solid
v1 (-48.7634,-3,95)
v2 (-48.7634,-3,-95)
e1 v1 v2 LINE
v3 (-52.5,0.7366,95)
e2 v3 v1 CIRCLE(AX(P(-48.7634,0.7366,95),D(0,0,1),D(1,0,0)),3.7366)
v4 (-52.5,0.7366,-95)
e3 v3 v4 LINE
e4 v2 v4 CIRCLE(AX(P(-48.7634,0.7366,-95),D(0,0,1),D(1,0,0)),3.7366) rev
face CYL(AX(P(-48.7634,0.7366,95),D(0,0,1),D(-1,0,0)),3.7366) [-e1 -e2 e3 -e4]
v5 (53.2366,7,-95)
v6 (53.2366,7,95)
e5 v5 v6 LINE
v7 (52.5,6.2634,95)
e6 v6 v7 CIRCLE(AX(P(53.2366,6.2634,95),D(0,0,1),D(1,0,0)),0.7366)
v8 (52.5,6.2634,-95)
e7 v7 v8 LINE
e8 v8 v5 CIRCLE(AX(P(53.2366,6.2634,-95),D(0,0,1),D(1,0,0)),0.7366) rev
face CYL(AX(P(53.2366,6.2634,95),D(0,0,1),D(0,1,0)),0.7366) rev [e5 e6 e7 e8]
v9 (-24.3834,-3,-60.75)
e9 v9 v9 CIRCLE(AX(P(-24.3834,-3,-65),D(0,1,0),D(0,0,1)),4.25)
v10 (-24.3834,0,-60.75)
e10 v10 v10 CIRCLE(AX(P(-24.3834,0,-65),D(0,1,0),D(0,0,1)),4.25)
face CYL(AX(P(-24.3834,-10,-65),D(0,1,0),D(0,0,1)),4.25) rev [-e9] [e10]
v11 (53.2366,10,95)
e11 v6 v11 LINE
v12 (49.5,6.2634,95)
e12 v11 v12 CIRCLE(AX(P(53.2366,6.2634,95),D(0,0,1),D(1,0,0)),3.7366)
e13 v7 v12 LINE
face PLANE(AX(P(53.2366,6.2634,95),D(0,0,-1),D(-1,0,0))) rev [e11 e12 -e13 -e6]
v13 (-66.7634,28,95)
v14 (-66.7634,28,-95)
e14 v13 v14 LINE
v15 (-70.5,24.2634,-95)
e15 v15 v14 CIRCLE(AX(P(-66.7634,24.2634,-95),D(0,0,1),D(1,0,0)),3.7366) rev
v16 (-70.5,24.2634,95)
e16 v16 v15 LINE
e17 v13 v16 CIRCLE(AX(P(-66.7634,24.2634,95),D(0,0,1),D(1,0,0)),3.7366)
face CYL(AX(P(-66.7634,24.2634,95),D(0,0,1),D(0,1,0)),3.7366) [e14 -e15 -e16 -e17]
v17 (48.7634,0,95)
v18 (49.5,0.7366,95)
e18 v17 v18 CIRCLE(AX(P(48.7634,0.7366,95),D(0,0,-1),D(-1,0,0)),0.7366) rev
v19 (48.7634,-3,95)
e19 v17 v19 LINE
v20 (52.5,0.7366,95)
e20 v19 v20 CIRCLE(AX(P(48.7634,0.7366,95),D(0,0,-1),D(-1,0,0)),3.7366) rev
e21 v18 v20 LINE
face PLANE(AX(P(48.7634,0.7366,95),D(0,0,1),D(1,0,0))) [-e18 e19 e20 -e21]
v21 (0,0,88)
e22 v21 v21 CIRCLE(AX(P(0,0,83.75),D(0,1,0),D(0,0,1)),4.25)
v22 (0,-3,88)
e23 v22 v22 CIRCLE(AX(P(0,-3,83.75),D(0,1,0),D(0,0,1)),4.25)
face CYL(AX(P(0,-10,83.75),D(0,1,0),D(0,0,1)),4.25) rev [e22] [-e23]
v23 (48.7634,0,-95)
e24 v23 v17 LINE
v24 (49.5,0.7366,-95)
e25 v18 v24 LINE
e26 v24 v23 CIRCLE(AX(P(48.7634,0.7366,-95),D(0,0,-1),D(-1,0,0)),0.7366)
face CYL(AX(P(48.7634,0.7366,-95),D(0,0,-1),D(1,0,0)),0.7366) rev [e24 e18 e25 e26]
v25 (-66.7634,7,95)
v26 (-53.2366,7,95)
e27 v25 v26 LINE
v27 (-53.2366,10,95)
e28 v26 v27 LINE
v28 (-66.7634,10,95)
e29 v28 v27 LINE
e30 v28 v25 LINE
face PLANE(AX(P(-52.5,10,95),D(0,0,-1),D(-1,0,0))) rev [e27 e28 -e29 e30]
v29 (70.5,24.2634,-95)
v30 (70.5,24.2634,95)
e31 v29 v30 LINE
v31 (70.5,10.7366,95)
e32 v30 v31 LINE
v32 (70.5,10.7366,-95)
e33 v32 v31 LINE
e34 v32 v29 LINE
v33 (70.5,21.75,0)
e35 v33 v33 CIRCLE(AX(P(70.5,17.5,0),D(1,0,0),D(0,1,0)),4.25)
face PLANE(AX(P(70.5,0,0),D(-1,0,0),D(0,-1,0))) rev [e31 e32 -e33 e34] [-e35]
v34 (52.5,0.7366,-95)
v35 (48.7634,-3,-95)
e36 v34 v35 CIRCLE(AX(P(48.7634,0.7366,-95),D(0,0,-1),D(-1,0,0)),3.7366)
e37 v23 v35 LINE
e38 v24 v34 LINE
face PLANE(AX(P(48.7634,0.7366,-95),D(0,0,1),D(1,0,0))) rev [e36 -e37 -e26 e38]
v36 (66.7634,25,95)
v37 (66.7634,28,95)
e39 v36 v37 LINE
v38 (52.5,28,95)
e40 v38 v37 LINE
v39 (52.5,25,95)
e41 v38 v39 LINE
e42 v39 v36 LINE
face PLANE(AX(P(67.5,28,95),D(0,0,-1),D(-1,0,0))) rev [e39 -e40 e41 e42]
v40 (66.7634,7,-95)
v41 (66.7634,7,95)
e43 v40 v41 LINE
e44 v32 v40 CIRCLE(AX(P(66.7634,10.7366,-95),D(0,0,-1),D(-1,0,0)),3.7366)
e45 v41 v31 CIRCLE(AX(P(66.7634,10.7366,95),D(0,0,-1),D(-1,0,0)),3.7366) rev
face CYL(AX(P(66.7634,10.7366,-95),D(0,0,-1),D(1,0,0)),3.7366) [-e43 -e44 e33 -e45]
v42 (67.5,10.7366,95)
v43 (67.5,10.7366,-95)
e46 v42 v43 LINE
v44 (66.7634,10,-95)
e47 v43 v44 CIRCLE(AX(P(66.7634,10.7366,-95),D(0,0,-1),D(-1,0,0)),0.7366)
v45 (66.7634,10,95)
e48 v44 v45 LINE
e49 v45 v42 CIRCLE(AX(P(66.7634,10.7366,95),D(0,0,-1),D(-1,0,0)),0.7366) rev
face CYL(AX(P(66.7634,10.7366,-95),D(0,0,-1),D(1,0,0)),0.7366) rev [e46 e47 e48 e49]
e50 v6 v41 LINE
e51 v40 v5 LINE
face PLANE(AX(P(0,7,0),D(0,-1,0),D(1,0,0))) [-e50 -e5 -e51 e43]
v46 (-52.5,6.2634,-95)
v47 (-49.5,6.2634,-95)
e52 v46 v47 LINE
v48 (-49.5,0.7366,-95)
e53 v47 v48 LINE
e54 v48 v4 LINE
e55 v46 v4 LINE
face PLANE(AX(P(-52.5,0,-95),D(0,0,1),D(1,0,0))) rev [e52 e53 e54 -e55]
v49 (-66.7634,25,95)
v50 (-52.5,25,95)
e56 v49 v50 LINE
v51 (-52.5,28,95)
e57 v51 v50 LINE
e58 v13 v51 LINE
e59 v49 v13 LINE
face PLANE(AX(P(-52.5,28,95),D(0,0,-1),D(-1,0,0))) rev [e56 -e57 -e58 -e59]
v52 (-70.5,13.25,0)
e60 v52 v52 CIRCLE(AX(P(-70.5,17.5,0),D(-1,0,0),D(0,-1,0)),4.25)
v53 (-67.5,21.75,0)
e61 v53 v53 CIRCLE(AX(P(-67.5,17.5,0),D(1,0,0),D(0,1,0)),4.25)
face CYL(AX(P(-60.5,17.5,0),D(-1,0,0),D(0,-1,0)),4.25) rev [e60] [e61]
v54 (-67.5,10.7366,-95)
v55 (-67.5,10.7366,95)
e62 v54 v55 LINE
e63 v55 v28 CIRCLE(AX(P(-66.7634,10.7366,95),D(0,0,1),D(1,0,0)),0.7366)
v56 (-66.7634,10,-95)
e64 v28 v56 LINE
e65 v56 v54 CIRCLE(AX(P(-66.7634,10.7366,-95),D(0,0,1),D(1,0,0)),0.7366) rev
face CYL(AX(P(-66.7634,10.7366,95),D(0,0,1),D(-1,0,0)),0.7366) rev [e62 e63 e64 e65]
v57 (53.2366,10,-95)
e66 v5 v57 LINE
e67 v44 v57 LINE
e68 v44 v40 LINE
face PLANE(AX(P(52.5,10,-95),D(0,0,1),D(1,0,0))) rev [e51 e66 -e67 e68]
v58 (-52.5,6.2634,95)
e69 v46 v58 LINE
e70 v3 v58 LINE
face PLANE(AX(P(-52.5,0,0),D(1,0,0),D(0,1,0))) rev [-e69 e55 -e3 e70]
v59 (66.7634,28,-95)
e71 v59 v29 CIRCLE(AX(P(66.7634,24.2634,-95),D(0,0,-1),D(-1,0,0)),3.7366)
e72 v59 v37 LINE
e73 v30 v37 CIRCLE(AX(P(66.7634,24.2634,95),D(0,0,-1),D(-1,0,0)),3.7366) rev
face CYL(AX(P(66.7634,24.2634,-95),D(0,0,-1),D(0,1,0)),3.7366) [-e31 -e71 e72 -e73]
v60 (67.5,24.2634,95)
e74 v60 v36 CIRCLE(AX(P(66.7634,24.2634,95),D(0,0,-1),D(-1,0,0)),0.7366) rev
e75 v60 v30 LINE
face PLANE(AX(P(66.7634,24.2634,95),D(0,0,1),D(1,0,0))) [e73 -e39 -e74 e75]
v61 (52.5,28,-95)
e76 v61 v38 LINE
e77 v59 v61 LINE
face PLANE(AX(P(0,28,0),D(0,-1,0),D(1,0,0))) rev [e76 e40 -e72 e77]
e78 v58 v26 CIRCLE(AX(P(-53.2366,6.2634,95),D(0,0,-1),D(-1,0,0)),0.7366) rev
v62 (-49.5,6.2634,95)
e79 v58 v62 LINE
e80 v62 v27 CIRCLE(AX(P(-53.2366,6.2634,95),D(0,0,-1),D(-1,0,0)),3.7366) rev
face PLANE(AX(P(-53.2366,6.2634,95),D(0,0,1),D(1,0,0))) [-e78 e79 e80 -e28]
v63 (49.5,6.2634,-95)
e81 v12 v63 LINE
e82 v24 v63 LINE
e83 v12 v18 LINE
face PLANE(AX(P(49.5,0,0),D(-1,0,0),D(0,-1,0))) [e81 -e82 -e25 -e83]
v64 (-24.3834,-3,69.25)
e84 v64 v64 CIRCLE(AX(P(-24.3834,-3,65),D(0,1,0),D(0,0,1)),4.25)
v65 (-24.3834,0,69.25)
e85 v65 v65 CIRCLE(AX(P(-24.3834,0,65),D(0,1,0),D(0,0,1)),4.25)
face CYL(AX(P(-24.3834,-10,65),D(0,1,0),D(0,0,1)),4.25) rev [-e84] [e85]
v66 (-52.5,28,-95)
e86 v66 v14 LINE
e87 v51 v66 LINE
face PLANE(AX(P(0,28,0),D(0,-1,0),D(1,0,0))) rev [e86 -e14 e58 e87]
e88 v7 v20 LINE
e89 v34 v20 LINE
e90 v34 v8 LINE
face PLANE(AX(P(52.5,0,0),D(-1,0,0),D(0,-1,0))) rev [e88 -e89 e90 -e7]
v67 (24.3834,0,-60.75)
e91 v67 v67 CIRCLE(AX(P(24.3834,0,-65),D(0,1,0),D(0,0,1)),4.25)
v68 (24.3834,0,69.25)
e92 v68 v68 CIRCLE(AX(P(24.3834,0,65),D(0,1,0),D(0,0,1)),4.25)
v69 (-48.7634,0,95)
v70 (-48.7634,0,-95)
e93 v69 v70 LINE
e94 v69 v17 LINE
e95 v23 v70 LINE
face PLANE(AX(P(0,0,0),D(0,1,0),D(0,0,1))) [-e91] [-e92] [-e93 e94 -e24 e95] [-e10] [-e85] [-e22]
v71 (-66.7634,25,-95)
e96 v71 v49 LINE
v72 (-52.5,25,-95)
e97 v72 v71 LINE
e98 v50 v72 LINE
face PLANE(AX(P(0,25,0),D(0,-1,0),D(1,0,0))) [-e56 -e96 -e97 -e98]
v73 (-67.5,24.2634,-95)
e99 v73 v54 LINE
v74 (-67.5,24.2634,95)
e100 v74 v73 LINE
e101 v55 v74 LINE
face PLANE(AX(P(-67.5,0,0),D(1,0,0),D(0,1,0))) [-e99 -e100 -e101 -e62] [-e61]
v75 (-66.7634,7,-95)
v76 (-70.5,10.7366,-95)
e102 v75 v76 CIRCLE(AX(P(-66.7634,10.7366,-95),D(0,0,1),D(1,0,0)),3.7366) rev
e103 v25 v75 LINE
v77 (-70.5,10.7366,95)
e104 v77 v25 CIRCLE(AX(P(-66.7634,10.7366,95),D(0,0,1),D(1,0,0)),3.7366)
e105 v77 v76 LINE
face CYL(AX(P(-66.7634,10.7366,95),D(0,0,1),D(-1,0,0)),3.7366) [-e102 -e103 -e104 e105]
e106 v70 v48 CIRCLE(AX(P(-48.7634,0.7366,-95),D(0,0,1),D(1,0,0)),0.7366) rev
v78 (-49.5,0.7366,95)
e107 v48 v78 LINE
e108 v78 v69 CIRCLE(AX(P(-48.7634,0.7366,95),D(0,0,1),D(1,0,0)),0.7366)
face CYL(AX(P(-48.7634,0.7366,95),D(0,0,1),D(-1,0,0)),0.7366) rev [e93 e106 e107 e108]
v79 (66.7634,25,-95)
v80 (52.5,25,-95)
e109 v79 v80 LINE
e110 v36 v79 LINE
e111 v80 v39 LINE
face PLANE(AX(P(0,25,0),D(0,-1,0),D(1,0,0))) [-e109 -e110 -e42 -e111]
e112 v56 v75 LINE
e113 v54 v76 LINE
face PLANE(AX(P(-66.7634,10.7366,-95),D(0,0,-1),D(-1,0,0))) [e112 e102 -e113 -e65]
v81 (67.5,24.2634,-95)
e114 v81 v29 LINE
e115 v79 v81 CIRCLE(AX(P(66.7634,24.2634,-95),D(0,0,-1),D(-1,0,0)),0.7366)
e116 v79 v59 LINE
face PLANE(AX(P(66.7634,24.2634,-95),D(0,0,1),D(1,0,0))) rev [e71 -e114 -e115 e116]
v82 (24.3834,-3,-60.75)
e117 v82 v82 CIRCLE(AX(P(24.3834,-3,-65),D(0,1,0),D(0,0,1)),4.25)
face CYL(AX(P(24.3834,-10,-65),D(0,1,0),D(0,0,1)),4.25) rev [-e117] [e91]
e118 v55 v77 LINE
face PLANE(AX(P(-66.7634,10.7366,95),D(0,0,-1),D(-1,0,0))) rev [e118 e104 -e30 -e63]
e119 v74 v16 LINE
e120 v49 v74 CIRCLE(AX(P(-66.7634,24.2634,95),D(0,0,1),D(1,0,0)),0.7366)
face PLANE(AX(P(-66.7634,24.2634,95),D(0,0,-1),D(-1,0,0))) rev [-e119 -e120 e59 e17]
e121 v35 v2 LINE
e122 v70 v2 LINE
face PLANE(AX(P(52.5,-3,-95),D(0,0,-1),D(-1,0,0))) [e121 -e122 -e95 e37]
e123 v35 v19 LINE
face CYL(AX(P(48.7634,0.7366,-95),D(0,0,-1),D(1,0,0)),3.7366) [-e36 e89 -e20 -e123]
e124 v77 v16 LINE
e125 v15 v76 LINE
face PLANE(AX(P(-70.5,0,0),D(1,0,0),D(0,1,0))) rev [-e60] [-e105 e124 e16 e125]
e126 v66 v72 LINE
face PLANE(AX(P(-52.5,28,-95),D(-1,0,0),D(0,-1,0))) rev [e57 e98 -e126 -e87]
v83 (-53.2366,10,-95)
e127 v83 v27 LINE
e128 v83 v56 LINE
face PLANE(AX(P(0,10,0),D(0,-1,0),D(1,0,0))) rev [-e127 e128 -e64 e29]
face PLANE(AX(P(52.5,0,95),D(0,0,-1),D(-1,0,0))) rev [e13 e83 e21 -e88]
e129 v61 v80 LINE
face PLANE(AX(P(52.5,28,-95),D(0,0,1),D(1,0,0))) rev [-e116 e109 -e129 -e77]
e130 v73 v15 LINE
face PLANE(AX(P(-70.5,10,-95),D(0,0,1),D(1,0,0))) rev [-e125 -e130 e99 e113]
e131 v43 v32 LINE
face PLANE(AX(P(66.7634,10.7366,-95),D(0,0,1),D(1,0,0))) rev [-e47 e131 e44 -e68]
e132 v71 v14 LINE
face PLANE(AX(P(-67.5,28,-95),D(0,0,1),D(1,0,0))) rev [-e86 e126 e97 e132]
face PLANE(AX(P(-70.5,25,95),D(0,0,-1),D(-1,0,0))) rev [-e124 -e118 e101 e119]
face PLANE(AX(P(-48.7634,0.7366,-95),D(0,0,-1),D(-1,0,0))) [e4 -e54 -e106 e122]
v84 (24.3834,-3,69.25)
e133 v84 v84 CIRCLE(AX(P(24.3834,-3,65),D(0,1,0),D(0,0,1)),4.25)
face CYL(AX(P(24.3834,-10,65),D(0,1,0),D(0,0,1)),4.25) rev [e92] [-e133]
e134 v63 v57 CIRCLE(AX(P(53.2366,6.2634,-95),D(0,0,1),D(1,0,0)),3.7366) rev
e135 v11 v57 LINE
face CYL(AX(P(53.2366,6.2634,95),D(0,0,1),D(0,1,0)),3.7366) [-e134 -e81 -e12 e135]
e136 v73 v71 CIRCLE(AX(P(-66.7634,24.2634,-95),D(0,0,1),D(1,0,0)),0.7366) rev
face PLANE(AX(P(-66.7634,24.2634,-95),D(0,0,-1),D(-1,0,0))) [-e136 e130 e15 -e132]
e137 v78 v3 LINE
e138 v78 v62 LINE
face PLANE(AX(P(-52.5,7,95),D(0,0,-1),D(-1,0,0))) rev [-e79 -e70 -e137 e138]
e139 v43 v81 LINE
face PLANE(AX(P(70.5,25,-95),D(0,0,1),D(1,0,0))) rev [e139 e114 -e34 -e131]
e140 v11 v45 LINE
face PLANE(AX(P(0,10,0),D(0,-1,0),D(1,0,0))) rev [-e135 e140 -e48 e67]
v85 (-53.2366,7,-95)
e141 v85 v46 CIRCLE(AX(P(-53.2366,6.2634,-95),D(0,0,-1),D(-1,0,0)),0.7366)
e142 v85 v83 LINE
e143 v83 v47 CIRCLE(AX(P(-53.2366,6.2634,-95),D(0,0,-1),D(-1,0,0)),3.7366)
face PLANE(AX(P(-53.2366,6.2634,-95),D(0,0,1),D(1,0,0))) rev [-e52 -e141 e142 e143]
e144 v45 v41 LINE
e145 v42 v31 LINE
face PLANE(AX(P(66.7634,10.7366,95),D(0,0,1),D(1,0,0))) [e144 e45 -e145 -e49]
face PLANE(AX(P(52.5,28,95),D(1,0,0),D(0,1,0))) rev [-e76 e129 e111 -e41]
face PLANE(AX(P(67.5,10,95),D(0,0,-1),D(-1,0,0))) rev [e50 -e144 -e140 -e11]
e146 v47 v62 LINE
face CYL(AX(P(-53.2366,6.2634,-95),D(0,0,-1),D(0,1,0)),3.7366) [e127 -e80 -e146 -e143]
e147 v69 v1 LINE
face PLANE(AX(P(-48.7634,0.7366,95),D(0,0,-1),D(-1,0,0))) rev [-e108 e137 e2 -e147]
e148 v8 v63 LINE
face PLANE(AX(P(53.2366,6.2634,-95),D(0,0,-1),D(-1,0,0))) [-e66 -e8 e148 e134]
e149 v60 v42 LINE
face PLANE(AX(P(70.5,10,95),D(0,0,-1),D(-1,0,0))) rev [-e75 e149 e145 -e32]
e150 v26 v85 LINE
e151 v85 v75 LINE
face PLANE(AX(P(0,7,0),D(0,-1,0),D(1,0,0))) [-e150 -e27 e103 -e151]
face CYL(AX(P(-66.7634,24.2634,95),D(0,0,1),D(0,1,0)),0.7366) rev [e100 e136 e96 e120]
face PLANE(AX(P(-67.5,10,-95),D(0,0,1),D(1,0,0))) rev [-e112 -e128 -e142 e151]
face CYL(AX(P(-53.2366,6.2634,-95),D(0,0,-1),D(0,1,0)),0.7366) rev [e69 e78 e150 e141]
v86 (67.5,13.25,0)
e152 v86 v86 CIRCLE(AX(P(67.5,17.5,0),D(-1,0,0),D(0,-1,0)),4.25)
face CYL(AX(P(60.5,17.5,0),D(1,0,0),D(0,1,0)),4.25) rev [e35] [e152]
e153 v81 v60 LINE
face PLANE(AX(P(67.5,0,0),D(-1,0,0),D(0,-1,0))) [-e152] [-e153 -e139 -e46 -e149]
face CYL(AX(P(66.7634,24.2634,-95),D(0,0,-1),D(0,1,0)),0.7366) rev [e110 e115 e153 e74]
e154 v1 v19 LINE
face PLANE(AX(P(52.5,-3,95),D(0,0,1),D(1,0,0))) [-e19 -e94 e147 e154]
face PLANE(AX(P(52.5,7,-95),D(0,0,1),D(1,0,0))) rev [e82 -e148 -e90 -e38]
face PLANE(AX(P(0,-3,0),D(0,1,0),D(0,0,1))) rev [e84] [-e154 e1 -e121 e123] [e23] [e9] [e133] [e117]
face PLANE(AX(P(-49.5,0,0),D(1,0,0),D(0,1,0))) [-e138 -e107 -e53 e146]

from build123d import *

# Parameters (mm, degrees)
SKETCH1_W                       = 105
SKETCH1_H                       = 190
BASE_FLANGE1_DEPTH              = 3
EDGE_FLANGE1_STRIP_W            = 13.4732
EDGE_FLANGE1_STRIP_H            = 3
EDGE_FLANGE1_STRIP_CUT_DEPTH    = 190
EDGE_FLANGE1_STRIP_2_W          = 13.4732
EDGE_FLANGE1_STRIP_2_H          = 3
EDGE_FLANGE1_STRIP_CUT_2_DEPTH  = 190
EDGE_FLANGE1_DEPTH              = 190
EDGE_FLANGE1_BEND_DEPTH         = 190
SKETCH33_R                      = 4.25
CUT_EXTRUDE1_DEPTH              = 10
EDGE_FLANGE8_STRIP_W            = 13.4732
EDGE_FLANGE8_STRIP_H            = 3
EDGE_FLANGE8_STRIP_CUT_DEPTH    = 190
EDGE_FLANGE8_STRIP_2_W          = 13.4732
EDGE_FLANGE8_STRIP_2_H          = 3
EDGE_FLANGE8_STRIP_CUT_2_DEPTH  = 190
EDGE_FLANGE8_DEPTH              = 190
EDGE_FLANGE8_BEND_DEPTH         = 190
EDGE_FLANGE9_STRIP_W            = 13.4732
EDGE_FLANGE9_STRIP_H            = 3
EDGE_FLANGE9_STRIP_CUT_DEPTH    = 190
EDGE_FLANGE9_STRIP_2_W          = 13.4732
EDGE_FLANGE9_STRIP_2_H          = 3
EDGE_FLANGE9_STRIP_CUT_2_DEPTH  = 190
EDGE_FLANGE9_DEPTH              = 190
EDGE_FLANGE9_BEND_DEPTH         = 190
EDGE_FLANGE10_STRIP_W           = 13.4732
EDGE_FLANGE10_STRIP_H           = 3
EDGE_FLANGE10_STRIP_CUT_DEPTH   = 190
EDGE_FLANGE10_STRIP_2_W         = 13.4732
EDGE_FLANGE10_STRIP_2_H         = 3
EDGE_FLANGE10_STRIP_CUT_2_DEPTH = 190
EDGE_FLANGE10_DEPTH             = 190
EDGE_FLANGE10_BEND_DEPTH        = 190
SKETCH72_R                      = 4.25
CUT_EXTRUDE4_DEPTH              = 10
CUT_EXTRUDE5_START              = -10
SKETCH77_R                      = 4.25
CUT_EXTRUDE5_DEPTH              = 10
SKETCH78_R                      = 4.25
CUT_EXTRUDE8_DEPTH              = 10


# Sheet-metal steps are written as plain solids
with BuildPart() as part:
    # Sketch1 → Base-Flange1 (new body)
    with BuildSketch(Plane(origin=(0, 0, 0), x_dir=(1, 0, 0), z_dir=(0, 1, 0))):
        Rectangle(SKETCH1_W, SKETCH1_H)
    extrude(amount=-BASE_FLANGE1_DEPTH)

    # Edge-Flange1 strip (across the edge) → Edge-Flange1 strip cut (cut)
    with BuildSketch(Plane(origin=(52.5, 0, 95), x_dir=(-1, 0, 0), z_dir=(0, 0, -1))):
        with Locations((-3, -1.5)):
            Rectangle(EDGE_FLANGE1_STRIP_W, EDGE_FLANGE1_STRIP_H)
    extrude(amount=EDGE_FLANGE1_STRIP_CUT_DEPTH, mode=Mode.SUBTRACT)

    # Edge-Flange1 strip 2 (across the edge) → Edge-Flange1 strip cut 2 (cut)
    with BuildSketch(Plane(origin=(-52.5, 0, -95), x_dir=(1, 0, 0), z_dir=(0, 0, 1))):
        with Locations((-3, -1.5)):
            Rectangle(EDGE_FLANGE1_STRIP_2_W, EDGE_FLANGE1_STRIP_2_H)
    extrude(amount=EDGE_FLANGE1_STRIP_CUT_2_DEPTH, mode=Mode.SUBTRACT)

    # Edge-Flange1 section (across the edge) → Edge-Flange1 (add)
    with BuildSketch(Plane(origin=(52.5, 0, 95), x_dir=(-1, 0, 0), z_dir=(0, 0, -1))):
        with BuildLine():
            Line((0, 0.7366), (0, 7))
            Line((0, 7), (3, 7))
            Line((3, 7), (3, 0.7366))
            ThreePointArc((3, 0.7366), (3.215745145, 0.215745145), (3.7366, 0))
            Line((3.7366, 0), (3.7366, -3))
            ThreePointArc((3.7366, -3), (1.094424801, -1.905575199), (0, 0.7366))
        make_face()
    extrude(amount=EDGE_FLANGE1_DEPTH)

    # Edge-Flange1 section 2 (across the edge) → Edge-Flange1 bend (add)
    with BuildSketch(Plane(origin=(-52.5, 0, -95), x_dir=(1, 0, 0), z_dir=(0, 0, 1))):
        with BuildLine():
            Line((0, 0.7366), (0, 7))
            Line((0, 7), (3, 7))
            Line((3, 7), (3, 0.7366))
            ThreePointArc((3, 0.7366), (3.215745145, 0.215745145), (3.7366, 0))
            Line((3.7366, 0), (3.7366, -3))
            ThreePointArc((3.7366, -3), (1.094424801, -1.905575199), (0, 0.7366))
        make_face()
    extrude(amount=EDGE_FLANGE1_BEND_DEPTH)

    # Sketch33 → Cut-Extrude1 (cut)
    with BuildSketch(Plane(origin=(0, 0, 0), x_dir=(1, 0, 0), z_dir=(0, 1, 0))):
        with Locations(Location((24.3834, -65, 0), (0, 0, 270))):
            Circle(SKETCH33_R)
        with Locations(Location((24.3834, 65, 0), (0, 0, 270))):
            Circle(SKETCH33_R)
        with Locations(Location((-24.3834, 65, 0), (0, 0, 270))):
            Circle(SKETCH33_R)
        with Locations(Location((-24.3834, -65, 0), (0, 0, 270))):
            Circle(SKETCH33_R)
    extrude(amount=-CUT_EXTRUDE1_DEPTH, mode=Mode.SUBTRACT)

    # Edge-Flange8 strip (across the edge) → Edge-Flange8 strip cut (cut)
    with BuildSketch(Plane(origin=(-52.5, 7, 95), x_dir=(0, -1, 0), z_dir=(0, 0, -1))):
        with Locations((-6, -1.5)):
            Rectangle(EDGE_FLANGE8_STRIP_W, EDGE_FLANGE8_STRIP_H)
    extrude(amount=EDGE_FLANGE8_STRIP_CUT_DEPTH, mode=Mode.SUBTRACT)

    # Edge-Flange8 strip 2 (across the edge) → Edge-Flange8 strip cut 2 (cut)
    with BuildSketch(Plane(origin=(52.5, 7, -95), x_dir=(0, -1, 0), z_dir=(0, 0, 1))):
        with Locations((-6, -1.5)):
            Rectangle(EDGE_FLANGE8_STRIP_2_W, EDGE_FLANGE8_STRIP_2_H)
    extrude(amount=EDGE_FLANGE8_STRIP_CUT_2_DEPTH, mode=Mode.SUBTRACT)

    # Edge-Flange8 section (across the edge) → Edge-Flange8 (add)
    with BuildSketch(Plane(origin=(-52.5, 7, 95), x_dir=(0, -1, 0), z_dir=(0, 0, -1))):
        with BuildLine():
            Line((-3, 0.7366), (-3, 15))
            Line((-3, 15), (0, 15))
            Line((0, 15), (0, 0.7366))
            ThreePointArc((0, 0.7366), (0.215745145, 0.215745145), (0.7366, 0))
            Line((0.7366, 0), (0.7366, -3))
            ThreePointArc((0.7366, -3), (-1.905575199, -1.905575199), (-3, 0.7366))
        make_face()
    extrude(amount=EDGE_FLANGE8_DEPTH)

    # Edge-Flange8 section 2 (across the edge) → Edge-Flange8 bend (add)
    with BuildSketch(Plane(origin=(52.5, 7, -95), x_dir=(0, -1, 0), z_dir=(0, 0, 1))):
        with BuildLine():
            Line((-3, 0.7366), (-3, 15))
            Line((-3, 15), (0, 15))
            Line((0, 15), (0, 0.7366))
            ThreePointArc((0, 0.7366), (0.215745145, 0.215745145), (0.7366, 0))
            Line((0.7366, 0), (0.7366, -3))
            ThreePointArc((0.7366, -3), (-1.905575199, -1.905575199), (-3, 0.7366))
        make_face()
    extrude(amount=EDGE_FLANGE8_BEND_DEPTH)

    # Edge-Flange9 strip (across the edge) → Edge-Flange9 strip cut (cut)
    with BuildSketch(Plane(origin=(-67.5, 10, -95), x_dir=(1, 0, 0), z_dir=(0, 0, 1))):
        with Locations((-6, -1.5)):
            Rectangle(EDGE_FLANGE9_STRIP_W, EDGE_FLANGE9_STRIP_H)
    extrude(amount=EDGE_FLANGE9_STRIP_CUT_DEPTH, mode=Mode.SUBTRACT)

    # Edge-Flange9 strip 2 (across the edge) → Edge-Flange9 strip cut 2 (cut)
    with BuildSketch(Plane(origin=(67.5, 10, 95), x_dir=(-1, 0, 0), z_dir=(0, 0, -1))):
        with Locations((-6, -1.5)):
            Rectangle(EDGE_FLANGE9_STRIP_2_W, EDGE_FLANGE9_STRIP_2_H)
    extrude(amount=EDGE_FLANGE9_STRIP_CUT_2_DEPTH, mode=Mode.SUBTRACT)

    # Edge-Flange9 section (across the edge) → Edge-Flange9 (add)
    with BuildSketch(Plane(origin=(-67.5, 10, -95), x_dir=(1, 0, 0), z_dir=(0, 0, 1))):
        with BuildLine():
            Line((-3, 0.7366), (-3, 15))
            Line((-3, 15), (0, 15))
            Line((0, 15), (0, 0.7366))
            ThreePointArc((0, 0.7366), (0.215745145, 0.215745145), (0.7366, 0))
            Line((0.7366, 0), (0.7366, -3))
            ThreePointArc((0.7366, -3), (-1.905575199, -1.905575199), (-3, 0.7366))
        make_face()
    extrude(amount=EDGE_FLANGE9_DEPTH)

    # Edge-Flange9 section 2 (across the edge) → Edge-Flange9 bend (add)
    with BuildSketch(Plane(origin=(67.5, 10, 95), x_dir=(-1, 0, 0), z_dir=(0, 0, -1))):
        with BuildLine():
            Line((-3, 0.7366), (-3, 15))
            Line((-3, 15), (0, 15))
            Line((0, 15), (0, 0.7366))
            ThreePointArc((0, 0.7366), (0.215745145, 0.215745145), (0.7366, 0))
            Line((0.7366, 0), (0.7366, -3))
            ThreePointArc((0.7366, -3), (-1.905575199, -1.905575199), (-3, 0.7366))
        make_face()
    extrude(amount=EDGE_FLANGE9_BEND_DEPTH)

    # Edge-Flange10 strip (across the edge) → Edge-Flange10 strip cut (cut)
    with BuildSketch(Plane(origin=(-67.5, 25, -95), x_dir=(0, -1, 0), z_dir=(0, 0, 1))):
        with Locations((-6, -1.5)):
            Rectangle(EDGE_FLANGE10_STRIP_W, EDGE_FLANGE10_STRIP_H)
    extrude(amount=EDGE_FLANGE10_STRIP_CUT_DEPTH, mode=Mode.SUBTRACT)

    # Edge-Flange10 strip 2 (across the edge) → Edge-Flange10 strip cut 2 (cut)
    with BuildSketch(Plane(origin=(67.5, 25, 95), x_dir=(0, -1, 0), z_dir=(0, 0, -1))):
        with Locations((-6, -1.5)):
            Rectangle(EDGE_FLANGE10_STRIP_2_W, EDGE_FLANGE10_STRIP_2_H)
    extrude(amount=EDGE_FLANGE10_STRIP_CUT_2_DEPTH, mode=Mode.SUBTRACT)

    # Edge-Flange10 section (across the edge) → Edge-Flange10 (add)
    with BuildSketch(Plane(origin=(-67.5, 25, -95), x_dir=(0, -1, 0), z_dir=(0, 0, 1))):
        with BuildLine():
            Line((-3, 0.7366), (-3, 15))
            Line((-3, 15), (0, 15))
            Line((0, 15), (0, 0.7366))
            ThreePointArc((0, 0.7366), (0.215745145, 0.215745145), (0.7366, 0))
            Line((0.7366, 0), (0.7366, -3))
            ThreePointArc((0.7366, -3), (-1.905575199, -1.905575199), (-3, 0.7366))
        make_face()
    extrude(amount=EDGE_FLANGE10_DEPTH)

    # Edge-Flange10 section 2 (across the edge) → Edge-Flange10 bend (add)
    with BuildSketch(Plane(origin=(67.5, 25, 95), x_dir=(0, -1, 0), z_dir=(0, 0, -1))):
        with BuildLine():
            Line((-3, 0.7366), (-3, 15))
            Line((-3, 15), (0, 15))
            Line((0, 15), (0, 0.7366))
            ThreePointArc((0, 0.7366), (0.215745145, 0.215745145), (0.7366, 0))
            Line((0.7366, 0), (0.7366, -3))
            ThreePointArc((0.7366, -3), (-1.905575199, -1.905575199), (-3, 0.7366))
        make_face()
    extrude(amount=EDGE_FLANGE10_BEND_DEPTH)

    # Sketch72 → Cut-Extrude4 (cut)
    with BuildSketch(Plane(origin=(70.5, 0, 0), x_dir=(0, 0, -1), z_dir=(1, 0, 0))):
        with Locations(Location((0, 17.5, 0), (0, 0, 90))):
            Circle(SKETCH72_R)
    extrude(amount=-CUT_EXTRUDE4_DEPTH, mode=Mode.SUBTRACT)

    # Sketch77 → Cut-Extrude5 (cut)
    with BuildSketch(Plane.ZY.offset(70.5).offset(CUT_EXTRUDE5_START)):
        with Locations(Location((0, 17.5, 0), (0, 0, 90))):
            Circle(SKETCH77_R)
    extrude(amount=CUT_EXTRUDE5_DEPTH, mode=Mode.SUBTRACT)

    # Sketch78 → Cut-Extrude8 (cut)
    with BuildSketch(Plane(origin=(0, 0, 0), x_dir=(1, 0, 0), z_dir=(0, 1, 0))):
        with Locations(Location((0, -83.75, 0), (0, 0, 270))):
            Circle(SKETCH78_R)
    extrude(amount=-CUT_EXTRUDE8_DEPTH, mode=Mode.SUBTRACT)


solid = part.part
